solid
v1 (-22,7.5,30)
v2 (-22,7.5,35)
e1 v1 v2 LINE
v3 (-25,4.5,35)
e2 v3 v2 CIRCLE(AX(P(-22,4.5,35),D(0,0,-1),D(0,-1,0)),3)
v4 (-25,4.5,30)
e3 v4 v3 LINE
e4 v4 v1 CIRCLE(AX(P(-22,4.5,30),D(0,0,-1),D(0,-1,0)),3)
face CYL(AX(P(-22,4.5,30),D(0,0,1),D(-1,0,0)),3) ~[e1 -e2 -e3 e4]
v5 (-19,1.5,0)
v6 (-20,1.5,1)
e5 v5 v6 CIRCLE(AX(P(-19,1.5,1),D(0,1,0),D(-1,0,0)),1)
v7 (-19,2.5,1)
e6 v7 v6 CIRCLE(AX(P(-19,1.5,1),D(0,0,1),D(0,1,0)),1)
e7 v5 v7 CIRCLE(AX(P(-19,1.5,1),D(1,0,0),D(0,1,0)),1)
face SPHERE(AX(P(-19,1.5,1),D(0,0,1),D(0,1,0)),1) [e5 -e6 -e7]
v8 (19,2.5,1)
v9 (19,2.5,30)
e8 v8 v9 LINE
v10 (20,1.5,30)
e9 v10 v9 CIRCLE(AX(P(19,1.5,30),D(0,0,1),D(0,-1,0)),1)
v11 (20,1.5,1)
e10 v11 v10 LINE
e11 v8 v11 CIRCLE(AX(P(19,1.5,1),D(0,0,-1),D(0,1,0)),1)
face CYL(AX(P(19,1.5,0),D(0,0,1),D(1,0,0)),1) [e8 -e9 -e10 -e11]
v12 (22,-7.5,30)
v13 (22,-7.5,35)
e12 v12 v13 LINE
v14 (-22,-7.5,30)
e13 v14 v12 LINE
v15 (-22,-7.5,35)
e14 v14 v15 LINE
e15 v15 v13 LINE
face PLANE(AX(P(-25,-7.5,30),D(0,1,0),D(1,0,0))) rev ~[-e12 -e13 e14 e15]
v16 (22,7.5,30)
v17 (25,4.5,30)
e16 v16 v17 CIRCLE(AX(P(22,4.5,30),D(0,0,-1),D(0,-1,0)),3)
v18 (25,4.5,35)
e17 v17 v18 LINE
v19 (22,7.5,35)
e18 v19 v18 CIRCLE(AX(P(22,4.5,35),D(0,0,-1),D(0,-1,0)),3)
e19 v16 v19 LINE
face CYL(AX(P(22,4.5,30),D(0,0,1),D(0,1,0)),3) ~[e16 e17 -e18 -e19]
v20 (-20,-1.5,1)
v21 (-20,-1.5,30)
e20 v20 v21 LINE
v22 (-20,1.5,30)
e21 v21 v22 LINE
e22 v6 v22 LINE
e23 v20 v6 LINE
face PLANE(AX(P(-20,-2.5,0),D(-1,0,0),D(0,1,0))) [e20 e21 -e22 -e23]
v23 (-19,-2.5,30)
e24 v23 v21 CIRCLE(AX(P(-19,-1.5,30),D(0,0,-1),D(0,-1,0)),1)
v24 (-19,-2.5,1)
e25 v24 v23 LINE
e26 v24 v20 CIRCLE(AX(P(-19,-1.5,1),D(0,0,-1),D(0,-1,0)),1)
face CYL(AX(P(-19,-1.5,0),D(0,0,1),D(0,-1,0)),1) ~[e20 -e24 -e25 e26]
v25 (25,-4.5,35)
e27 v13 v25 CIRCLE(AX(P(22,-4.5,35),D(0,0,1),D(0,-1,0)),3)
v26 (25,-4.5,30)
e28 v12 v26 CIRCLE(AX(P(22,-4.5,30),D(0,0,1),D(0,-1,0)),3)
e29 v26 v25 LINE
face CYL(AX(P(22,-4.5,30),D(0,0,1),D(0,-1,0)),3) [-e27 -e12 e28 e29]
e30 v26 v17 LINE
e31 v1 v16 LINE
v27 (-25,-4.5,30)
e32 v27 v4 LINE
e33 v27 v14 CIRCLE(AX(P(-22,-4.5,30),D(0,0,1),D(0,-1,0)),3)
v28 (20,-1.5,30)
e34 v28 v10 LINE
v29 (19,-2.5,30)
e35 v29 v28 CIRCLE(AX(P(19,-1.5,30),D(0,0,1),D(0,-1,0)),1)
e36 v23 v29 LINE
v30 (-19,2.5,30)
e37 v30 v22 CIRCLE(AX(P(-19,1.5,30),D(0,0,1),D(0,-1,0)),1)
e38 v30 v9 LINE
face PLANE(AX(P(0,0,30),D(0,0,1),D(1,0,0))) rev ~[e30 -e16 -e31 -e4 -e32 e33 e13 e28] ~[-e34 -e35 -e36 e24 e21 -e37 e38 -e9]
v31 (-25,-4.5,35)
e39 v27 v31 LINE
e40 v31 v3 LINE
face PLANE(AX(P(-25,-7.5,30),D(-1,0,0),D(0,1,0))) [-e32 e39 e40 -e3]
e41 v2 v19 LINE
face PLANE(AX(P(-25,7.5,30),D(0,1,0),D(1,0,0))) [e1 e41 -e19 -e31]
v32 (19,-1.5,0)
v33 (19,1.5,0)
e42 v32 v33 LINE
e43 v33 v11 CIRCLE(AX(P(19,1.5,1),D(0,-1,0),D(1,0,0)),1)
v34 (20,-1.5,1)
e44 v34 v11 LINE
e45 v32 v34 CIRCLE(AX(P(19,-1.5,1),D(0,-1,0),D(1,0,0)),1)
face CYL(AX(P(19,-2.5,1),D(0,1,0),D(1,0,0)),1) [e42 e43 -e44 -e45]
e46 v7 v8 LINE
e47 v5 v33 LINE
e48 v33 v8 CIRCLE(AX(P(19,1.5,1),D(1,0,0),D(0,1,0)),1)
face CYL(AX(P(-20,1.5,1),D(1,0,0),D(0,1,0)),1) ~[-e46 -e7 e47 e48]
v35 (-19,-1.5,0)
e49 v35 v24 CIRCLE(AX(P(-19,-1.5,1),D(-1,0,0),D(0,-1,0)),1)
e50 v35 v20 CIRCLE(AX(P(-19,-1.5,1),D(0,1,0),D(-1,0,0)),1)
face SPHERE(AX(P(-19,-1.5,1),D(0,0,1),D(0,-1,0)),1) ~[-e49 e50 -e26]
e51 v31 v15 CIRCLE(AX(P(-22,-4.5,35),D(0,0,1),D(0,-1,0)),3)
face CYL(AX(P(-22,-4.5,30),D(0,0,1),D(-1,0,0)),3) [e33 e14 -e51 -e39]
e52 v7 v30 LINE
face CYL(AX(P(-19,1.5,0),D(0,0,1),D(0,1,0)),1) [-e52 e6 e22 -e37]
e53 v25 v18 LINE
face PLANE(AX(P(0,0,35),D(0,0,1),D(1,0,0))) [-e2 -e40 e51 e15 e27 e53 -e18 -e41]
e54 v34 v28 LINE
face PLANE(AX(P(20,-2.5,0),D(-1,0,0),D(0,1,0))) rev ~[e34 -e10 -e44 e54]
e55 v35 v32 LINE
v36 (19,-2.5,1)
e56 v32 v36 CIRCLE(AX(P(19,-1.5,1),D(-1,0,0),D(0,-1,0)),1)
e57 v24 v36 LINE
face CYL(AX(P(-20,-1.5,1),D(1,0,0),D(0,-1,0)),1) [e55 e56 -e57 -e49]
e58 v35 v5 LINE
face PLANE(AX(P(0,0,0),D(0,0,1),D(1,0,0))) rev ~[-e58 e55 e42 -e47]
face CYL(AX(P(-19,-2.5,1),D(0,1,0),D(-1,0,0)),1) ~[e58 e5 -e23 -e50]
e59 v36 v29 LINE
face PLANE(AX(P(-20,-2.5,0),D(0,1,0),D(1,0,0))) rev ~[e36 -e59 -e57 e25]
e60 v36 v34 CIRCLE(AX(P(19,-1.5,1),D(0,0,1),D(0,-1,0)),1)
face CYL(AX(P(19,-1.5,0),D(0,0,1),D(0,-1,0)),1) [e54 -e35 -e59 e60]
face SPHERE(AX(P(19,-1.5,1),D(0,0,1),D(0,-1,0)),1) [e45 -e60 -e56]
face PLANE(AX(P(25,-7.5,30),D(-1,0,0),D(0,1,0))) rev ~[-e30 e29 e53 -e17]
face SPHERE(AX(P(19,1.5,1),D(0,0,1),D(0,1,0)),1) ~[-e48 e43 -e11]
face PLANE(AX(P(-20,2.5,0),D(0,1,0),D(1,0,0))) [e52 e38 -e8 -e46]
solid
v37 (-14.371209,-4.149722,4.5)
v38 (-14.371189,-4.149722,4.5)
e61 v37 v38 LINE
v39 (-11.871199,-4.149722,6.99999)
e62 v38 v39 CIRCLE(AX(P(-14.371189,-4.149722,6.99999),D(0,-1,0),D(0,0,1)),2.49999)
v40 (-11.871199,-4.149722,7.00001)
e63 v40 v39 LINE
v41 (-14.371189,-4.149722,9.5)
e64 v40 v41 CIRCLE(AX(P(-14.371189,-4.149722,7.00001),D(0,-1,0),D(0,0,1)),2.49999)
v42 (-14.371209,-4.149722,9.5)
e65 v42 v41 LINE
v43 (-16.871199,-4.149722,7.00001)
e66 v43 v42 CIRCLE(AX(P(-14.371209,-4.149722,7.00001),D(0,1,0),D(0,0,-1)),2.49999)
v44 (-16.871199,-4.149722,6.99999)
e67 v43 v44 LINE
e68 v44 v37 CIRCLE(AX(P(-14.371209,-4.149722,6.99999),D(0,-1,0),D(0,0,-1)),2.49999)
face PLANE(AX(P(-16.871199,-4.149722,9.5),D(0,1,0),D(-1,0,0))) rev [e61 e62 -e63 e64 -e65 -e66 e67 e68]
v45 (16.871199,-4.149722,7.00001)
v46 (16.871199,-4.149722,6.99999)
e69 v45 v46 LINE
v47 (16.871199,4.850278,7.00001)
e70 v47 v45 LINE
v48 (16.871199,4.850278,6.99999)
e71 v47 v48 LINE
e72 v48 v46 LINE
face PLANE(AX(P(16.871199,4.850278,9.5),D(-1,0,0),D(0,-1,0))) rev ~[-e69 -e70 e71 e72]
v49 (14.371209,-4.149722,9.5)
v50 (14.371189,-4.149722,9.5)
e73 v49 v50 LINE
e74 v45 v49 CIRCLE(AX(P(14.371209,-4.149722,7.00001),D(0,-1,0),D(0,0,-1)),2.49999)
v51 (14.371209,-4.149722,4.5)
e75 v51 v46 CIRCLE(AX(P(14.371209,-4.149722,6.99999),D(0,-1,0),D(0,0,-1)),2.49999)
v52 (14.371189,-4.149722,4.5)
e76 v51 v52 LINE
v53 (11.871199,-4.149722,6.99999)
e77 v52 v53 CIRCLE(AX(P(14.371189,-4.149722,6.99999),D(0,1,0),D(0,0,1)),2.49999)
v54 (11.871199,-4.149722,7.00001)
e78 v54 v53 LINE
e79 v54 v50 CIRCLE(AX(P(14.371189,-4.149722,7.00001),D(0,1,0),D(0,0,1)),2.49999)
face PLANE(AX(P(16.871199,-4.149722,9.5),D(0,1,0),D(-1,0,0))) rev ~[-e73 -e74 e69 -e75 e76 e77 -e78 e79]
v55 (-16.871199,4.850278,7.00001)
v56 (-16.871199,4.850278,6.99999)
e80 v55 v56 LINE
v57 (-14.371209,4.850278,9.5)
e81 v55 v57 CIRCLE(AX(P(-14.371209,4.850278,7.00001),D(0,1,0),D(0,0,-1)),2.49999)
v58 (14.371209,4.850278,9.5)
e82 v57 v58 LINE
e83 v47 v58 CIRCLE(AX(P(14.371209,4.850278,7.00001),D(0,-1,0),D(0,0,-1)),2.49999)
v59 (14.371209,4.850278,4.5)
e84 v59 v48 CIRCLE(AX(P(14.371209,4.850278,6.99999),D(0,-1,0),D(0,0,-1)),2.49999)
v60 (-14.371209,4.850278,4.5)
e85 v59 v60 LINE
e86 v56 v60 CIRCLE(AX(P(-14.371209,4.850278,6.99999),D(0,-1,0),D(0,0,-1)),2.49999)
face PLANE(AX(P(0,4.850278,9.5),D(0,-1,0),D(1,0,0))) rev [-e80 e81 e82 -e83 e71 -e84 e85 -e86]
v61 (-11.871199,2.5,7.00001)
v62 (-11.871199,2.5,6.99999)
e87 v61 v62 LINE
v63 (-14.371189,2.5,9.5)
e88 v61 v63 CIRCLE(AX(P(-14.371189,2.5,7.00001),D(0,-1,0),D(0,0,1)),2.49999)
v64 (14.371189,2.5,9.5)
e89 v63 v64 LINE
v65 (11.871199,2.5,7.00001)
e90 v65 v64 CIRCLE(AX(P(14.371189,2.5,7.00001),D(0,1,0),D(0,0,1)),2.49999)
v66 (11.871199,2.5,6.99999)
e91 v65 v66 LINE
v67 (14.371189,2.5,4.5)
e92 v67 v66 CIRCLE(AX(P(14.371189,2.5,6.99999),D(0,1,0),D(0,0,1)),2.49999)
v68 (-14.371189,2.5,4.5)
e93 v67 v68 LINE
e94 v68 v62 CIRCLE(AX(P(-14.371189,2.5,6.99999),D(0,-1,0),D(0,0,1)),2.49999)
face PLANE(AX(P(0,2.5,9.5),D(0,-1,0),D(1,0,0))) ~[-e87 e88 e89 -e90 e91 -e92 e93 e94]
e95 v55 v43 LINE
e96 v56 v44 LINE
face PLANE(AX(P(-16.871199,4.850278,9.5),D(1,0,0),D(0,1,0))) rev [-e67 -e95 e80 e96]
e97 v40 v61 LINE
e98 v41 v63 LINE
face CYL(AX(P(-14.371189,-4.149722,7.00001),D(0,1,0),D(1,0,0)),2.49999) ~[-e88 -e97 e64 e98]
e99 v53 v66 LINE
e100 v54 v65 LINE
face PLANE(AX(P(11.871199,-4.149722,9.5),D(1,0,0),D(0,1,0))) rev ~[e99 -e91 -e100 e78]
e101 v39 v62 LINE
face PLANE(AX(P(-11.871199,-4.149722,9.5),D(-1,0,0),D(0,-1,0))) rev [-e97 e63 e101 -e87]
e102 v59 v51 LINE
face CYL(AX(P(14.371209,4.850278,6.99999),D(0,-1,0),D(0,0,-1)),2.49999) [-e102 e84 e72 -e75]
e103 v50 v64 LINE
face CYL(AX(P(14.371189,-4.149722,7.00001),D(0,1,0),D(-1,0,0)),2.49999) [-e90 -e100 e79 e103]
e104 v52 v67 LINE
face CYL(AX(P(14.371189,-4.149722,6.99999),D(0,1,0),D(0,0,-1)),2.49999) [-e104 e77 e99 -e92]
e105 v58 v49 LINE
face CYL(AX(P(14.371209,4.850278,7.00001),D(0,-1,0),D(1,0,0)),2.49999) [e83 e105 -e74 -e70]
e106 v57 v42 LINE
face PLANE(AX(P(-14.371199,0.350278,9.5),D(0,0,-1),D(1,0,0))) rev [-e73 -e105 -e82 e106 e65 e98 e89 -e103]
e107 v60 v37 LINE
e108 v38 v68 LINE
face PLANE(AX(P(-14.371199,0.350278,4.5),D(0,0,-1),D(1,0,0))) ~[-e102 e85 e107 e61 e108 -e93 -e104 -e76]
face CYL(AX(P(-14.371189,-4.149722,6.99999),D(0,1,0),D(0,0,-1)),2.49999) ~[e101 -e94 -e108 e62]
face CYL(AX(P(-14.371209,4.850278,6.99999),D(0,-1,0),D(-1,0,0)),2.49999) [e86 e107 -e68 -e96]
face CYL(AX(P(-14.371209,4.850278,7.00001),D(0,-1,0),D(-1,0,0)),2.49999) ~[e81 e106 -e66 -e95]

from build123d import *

# Parameters (mm, degrees)
F0_W     = 40
F0_H     = 5
F1_DEPTH = 30
F2_W     = 50
F2_H     = 15
F3_DEPTH = 5
F4_R     = 1
F5_R     = 3
F7_W     = 11.8711991236
F7_H     = 2.3502776772
F8_DEPTH = 5
F10_R    = 2.49999


# Not quite as in the source:
# - a fillet or chamfer is up to 0.001 mm smaller than in the source, because OpenCascade refuses the exact size


with BuildPart() as f1:
    # F0 (on Top) → F1 (new body)
    with BuildSketch(Plane.XY):
        Rectangle(F0_W, F0_H)
    extrude(amount=F1_DEPTH)

    # F2 (on face) → F3 (join)
    with BuildSketch(Plane.XY.offset(30)):
        Rectangle(F2_W, F2_H)
    extrude(amount=F3_DEPTH)

    # F4
    f4_edges = [f1.edges().sort_by_distance(p)[0] for p in [
        (20, 2.5, 15),
        (20, -2.5, 15),
        (-20, -2.5, 15),
        (-20, 2.5, 15),
        (0, 2.5, 0),
        (0, -2.5, 0),
        (20, 0, 0),
        (-20, 0, 0),
    ]]
    fillet(f4_edges, radius=F4_R)

    # F5
    f5_edges = [f1.edges().sort_by_distance(p)[0] for p in [
        (25, 7.5, 32.5),
        (25, -7.5, 32.5),
        (-25, 7.5, 32.5),
        (-25, -7.5, 32.5),
    ]]
    fillet(f5_edges, radius=F5_R)


with BuildPart() as f8:
    # F7 (on offset) → F8 (new body)
    with BuildSketch(Plane(origin=(0, 0, 9.5), x_dir=(1, 0, 0), z_dir=(0, 0, -1))):
        Polygon((11.8711991236, -4.8502776772), (16.8711991236, -4.8502776772), (16.8711991236, 4.1497223228), (11.8711991236, 4.1497223228), (11.8711991236, -2.5), align=None)
        with Locations((5.9355995618, -3.6751388386)):
            Rectangle(F7_W, F7_H)
    extrude(amount=F8_DEPTH)

    # F9: F8 across plane


with BuildPart() as f8_1:
    add(f8.part)
    add(f8.part.mirror(Plane.YZ))

    # F10 (radius 2.5 in the source; OpenCascade refuses exactly that, so slightly less here)
    f10_edges = [f8_1.edges().sort_by_distance(p)[0] for p in [
        (-16.871199, 0.350278, 4.5),
        (-11.871199, -0.824861, 4.5),
        (11.871199, -0.824861, 4.5),
        (16.871199, 0.350278, 4.5),
        (16.871199, 0.350278, 9.5),
        (-11.871199, -0.824861, 9.5),
        (11.871199, -0.824861, 9.5),
        (-16.871199, 0.350278, 9.5),
    ]]
    fillet(f10_edges, radius=F10_R)


solid = Compound([f1.part, f8_1.part])
